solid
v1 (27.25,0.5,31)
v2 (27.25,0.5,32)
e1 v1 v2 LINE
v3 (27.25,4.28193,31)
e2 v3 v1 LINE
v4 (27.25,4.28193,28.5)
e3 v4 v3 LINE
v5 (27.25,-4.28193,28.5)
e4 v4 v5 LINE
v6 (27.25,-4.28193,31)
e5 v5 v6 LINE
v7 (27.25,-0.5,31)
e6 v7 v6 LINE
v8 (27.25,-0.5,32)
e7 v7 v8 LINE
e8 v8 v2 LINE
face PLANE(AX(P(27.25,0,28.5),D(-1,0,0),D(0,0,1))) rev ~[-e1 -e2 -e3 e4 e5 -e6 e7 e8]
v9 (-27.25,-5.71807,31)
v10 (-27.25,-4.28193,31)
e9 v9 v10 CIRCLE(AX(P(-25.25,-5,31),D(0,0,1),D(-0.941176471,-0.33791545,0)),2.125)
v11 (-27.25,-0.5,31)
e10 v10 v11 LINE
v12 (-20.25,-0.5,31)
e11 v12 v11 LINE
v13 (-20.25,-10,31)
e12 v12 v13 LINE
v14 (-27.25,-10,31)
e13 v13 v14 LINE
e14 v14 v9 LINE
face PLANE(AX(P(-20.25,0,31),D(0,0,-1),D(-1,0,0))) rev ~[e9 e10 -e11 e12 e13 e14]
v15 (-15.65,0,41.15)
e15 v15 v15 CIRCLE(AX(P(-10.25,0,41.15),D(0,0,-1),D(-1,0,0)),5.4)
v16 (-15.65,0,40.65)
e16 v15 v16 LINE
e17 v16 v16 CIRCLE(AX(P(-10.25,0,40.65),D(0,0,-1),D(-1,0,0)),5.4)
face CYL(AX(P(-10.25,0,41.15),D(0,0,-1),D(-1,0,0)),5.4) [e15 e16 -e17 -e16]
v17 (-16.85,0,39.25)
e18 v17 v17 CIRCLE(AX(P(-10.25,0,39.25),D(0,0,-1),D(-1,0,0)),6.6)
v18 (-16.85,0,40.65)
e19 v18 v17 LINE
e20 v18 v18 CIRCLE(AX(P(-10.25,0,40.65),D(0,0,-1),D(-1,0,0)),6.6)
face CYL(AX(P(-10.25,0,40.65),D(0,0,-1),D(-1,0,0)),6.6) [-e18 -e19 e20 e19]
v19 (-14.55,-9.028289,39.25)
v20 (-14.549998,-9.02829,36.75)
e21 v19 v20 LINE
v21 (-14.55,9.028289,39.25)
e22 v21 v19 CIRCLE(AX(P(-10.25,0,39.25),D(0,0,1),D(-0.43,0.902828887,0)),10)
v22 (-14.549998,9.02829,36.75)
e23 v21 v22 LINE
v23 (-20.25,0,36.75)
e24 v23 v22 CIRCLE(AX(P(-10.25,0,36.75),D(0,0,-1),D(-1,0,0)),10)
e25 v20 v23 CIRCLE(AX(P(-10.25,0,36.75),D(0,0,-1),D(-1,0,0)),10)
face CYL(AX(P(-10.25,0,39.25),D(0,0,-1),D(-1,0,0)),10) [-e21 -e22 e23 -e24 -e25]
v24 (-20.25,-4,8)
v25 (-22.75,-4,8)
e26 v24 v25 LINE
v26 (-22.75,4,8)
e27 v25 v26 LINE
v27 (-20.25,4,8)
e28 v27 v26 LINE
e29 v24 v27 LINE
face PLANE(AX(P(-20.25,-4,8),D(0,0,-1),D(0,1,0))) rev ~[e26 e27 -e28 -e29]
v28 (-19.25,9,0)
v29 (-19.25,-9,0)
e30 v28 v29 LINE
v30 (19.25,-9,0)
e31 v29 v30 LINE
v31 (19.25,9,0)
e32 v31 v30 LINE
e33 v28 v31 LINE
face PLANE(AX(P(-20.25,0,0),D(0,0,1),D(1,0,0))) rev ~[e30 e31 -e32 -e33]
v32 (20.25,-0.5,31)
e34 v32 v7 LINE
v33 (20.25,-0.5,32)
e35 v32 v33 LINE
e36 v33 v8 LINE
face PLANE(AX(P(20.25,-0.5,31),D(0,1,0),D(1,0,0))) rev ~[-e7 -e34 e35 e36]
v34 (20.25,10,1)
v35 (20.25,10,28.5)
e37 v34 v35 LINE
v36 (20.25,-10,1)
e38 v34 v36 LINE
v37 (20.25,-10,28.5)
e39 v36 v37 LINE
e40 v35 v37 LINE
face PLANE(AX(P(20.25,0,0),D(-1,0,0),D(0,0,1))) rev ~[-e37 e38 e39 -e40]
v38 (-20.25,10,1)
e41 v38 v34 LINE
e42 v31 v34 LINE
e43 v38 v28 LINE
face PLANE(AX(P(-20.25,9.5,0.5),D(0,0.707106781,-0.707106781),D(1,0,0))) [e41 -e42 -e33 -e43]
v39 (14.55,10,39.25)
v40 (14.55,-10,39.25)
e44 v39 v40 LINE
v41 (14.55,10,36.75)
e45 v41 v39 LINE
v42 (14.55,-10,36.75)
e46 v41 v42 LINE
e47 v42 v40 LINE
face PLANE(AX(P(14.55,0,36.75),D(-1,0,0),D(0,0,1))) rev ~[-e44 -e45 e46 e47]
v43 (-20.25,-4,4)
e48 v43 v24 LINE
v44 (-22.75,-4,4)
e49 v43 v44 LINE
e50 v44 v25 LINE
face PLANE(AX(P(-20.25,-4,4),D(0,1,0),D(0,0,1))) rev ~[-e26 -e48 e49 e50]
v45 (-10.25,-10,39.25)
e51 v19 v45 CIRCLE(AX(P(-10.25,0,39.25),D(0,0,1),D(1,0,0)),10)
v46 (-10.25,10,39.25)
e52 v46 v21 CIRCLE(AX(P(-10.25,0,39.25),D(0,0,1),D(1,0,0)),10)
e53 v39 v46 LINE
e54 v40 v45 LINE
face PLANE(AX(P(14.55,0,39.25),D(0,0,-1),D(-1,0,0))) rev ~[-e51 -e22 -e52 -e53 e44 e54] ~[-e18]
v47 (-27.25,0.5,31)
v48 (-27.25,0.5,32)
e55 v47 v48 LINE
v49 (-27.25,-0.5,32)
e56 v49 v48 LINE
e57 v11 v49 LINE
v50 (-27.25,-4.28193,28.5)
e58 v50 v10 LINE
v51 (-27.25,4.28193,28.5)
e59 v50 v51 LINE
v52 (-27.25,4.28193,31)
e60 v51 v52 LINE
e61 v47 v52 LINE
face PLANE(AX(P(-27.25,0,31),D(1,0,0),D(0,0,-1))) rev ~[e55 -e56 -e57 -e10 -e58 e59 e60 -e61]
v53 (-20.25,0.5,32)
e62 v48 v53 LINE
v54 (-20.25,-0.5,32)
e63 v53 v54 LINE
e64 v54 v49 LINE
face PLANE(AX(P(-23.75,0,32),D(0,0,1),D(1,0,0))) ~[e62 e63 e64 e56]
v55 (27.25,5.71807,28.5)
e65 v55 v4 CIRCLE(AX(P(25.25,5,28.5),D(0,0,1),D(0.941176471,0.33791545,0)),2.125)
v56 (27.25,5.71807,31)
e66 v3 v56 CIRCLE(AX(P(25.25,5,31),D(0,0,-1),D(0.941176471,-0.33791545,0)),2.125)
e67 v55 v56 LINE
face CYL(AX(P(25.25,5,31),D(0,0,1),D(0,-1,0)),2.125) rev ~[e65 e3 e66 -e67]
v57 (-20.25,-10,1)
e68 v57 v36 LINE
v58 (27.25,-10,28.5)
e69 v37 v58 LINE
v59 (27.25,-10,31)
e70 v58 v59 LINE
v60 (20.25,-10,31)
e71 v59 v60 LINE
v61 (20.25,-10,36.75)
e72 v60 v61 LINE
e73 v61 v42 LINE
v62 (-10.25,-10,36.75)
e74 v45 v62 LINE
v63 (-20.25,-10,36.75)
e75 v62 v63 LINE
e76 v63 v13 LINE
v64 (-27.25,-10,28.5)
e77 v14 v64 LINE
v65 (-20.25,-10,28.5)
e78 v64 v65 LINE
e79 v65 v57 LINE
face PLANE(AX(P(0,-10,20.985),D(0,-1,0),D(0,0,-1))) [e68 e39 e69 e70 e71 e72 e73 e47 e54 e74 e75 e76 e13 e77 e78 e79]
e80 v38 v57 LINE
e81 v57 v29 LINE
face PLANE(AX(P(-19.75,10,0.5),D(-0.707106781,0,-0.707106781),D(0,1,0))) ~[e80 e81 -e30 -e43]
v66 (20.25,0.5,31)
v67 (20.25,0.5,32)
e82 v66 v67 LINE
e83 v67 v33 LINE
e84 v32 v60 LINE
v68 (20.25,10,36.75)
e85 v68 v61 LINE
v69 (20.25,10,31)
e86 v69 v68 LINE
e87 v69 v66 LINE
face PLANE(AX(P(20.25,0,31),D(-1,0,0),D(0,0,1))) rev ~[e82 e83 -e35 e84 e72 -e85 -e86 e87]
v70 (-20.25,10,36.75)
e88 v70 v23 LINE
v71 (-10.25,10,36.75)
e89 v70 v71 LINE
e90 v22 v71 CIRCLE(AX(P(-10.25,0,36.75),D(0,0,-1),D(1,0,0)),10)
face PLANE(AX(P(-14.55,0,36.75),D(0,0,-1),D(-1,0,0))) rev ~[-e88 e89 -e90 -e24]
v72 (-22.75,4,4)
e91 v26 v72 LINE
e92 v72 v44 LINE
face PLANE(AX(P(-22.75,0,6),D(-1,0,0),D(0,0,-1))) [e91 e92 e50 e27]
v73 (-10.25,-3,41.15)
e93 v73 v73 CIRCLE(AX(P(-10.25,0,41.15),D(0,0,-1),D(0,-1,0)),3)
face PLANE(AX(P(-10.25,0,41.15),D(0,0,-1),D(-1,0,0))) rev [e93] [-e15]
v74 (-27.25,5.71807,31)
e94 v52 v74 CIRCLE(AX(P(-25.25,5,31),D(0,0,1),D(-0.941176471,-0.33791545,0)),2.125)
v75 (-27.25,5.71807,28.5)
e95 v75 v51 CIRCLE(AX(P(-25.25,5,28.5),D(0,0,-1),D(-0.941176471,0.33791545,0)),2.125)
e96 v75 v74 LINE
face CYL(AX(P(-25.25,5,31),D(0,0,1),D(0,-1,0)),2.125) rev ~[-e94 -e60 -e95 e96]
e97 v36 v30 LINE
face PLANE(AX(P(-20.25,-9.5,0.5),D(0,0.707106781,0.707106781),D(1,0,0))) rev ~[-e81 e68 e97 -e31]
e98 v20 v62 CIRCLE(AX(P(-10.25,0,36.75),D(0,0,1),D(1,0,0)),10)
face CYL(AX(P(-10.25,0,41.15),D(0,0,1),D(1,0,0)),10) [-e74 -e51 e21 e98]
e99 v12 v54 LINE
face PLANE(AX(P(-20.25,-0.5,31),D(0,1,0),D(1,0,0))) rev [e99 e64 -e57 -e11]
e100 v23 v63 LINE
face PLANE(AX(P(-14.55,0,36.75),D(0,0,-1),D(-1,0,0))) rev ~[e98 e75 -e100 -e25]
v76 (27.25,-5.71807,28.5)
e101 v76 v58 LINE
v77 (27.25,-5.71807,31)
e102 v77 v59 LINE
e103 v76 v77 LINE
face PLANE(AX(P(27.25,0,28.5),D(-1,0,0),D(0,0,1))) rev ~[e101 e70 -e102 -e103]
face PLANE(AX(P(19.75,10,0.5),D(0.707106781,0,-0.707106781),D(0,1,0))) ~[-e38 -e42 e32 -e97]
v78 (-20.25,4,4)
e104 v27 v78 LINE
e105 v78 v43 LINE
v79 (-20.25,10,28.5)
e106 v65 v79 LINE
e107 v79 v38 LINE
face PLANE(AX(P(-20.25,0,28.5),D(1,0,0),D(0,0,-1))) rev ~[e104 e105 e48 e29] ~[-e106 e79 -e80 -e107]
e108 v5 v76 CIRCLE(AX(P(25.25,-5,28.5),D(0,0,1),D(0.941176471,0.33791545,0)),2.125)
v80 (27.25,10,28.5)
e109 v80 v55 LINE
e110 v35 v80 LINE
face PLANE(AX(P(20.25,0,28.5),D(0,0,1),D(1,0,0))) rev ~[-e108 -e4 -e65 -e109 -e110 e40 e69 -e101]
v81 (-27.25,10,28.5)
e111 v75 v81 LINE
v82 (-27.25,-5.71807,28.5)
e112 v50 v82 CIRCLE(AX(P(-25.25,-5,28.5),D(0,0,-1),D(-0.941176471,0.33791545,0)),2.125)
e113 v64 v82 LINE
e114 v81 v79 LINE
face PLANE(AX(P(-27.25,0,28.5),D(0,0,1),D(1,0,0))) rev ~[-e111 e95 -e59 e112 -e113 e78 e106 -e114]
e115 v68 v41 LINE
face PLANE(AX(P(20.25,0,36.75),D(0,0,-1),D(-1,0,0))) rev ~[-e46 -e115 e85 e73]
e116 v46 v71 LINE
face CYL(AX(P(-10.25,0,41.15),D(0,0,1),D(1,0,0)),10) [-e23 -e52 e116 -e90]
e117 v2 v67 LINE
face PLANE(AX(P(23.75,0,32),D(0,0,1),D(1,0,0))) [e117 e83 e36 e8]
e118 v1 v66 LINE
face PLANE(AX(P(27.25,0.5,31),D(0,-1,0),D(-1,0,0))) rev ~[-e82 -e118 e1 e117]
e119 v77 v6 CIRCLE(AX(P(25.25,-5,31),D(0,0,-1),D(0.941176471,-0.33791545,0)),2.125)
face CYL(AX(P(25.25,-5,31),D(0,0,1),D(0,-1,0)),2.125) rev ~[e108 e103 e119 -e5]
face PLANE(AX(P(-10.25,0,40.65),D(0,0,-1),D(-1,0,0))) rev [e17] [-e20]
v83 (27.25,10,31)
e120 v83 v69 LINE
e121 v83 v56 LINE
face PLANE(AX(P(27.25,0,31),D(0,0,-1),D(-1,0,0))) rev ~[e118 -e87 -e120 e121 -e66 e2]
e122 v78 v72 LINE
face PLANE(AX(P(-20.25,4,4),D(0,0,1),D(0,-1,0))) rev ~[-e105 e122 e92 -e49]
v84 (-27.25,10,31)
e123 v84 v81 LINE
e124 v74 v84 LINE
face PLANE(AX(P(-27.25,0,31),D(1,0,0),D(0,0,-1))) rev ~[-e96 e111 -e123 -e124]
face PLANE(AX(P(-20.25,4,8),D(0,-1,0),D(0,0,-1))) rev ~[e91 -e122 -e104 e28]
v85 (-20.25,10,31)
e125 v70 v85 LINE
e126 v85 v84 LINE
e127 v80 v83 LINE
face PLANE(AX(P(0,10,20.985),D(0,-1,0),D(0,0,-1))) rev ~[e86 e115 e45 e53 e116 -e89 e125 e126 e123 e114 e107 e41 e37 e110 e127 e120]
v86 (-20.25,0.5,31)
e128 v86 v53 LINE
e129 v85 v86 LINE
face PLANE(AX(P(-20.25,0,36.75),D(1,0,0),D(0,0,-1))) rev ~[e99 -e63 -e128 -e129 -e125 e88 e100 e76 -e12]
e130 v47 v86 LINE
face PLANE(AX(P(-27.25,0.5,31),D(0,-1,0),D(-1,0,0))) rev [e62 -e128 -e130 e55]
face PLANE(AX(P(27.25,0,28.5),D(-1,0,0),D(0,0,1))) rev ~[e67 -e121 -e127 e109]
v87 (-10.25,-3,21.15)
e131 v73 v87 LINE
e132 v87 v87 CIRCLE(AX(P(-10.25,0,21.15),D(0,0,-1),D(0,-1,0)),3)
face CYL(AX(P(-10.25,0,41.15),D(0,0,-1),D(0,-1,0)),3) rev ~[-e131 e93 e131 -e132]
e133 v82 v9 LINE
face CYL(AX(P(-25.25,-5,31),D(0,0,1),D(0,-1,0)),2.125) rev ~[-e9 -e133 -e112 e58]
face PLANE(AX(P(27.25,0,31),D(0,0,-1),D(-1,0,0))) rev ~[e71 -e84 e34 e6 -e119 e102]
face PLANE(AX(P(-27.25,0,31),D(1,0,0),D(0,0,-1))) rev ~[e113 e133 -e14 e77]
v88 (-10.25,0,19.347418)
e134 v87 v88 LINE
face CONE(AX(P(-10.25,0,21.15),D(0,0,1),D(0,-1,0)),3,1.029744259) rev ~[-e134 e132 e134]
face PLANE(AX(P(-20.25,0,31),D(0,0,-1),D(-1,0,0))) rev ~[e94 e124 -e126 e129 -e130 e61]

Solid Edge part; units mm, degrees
sketch "Sketch1" plane through (0, 0, 0) normal (0, -1, 0) x (1, 0, 0)
  line L0 (-20.25, 28.5) -> (-20.25, 0)
  line L1 (-20.25, 0) -> (20.25, 0)
  line L2 (20.25, 0) -> (20.25, 28.5)
  line L3 (20.25, 28.5) -> (27.25, 28.5)
  line L4 (27.25, 28.5) -> (27.25, 31)
  line L5 (27.25, 31) -> (20.25, 31)
  line L6 (20.25, 31) -> (20.25, 36.75)
  line L7 (20.25, 36.75) -> (14.55, 36.75)
  line L8 (14.55, 36.75) -> (14.55, 39.25)
  line L9 (14.55, 39.25) -> (-14.55, 39.25)
  line L10 (-14.55, 39.25) -> (-14.55, 36.75)
  line L11 (-14.55, 36.75) -> (-20.25, 36.75)
  line L12 (-20.25, 36.75) -> (-20.25, 31)
  line L13 (-20.25, 31) -> (-27.25, 31)
  line L14 (-27.25, 31) -> (-27.25, 28.5)
  line L15 (-27.25, 28.5) -> (-20.25, 28.5)
  dimension "D1" = 40.5
  dimension "D2" = 54.5
  dimension "D3" = 5.7
  dimension "D4" = 39.25
  dimension "D5" = 36.75
  dimension "D6" = 28.5
  dimension "D7" = 2.5
extrude "Protrusion1" add sketch "Sketch1" along normal mid plane 20
hole "Hole_1" at (25.25, 5, 31) direction (0, 0, -1) diameter 4.25 end up to next
hole "Hole1" at (25.25, -5, 31) direction (0, 0, -1) diameter 4.25 end up to next
sketch "Sketch2" plane through (0, 0, 0) normal (0, -1, 0) x (1, 0, 0)
  line L0 (-20.25, 36.75) -> (-10.25, 36.75)
  line L1 (-10.25, 36.75) -> (-10.25, 41.15)
  line L2 (-10.25, 41.15) -> (-15.65, 41.15)
  line L3 (-15.65, 41.15) -> (-15.65, 40.65)
  line L4 (-15.65, 40.65) -> (-16.85, 40.65)
  line L5 (-16.85, 40.65) -> (-16.85, 39.25)
  line L6 (-16.85, 39.25) -> (-20.25, 39.25)
  line L7 (-20.25, 39.25) -> (-20.25, 36.75)
  dimension "D1" = 10
  dimension "D2" = 50
  dimension "D3" = 1.4
  dimension "D4" = 0.5
revolve "RevolvedProtrusion1" add sketch "Sketch2" angle 360 about axis through (-10.25, 0, 50) along (0, 0, -1)
sketch "Sketch3" plane through (-20.25, 0, 14.25) normal (-1, 0, 0) x (0, -1, 0)
  line L0 (-4, -10.25) -> (4, -10.25)
  line L1 (4, -10.25) -> (4, -6.25)
  line L2 (4, -6.25) -> (-4, -6.25)
  line L3 (-4, -6.25) -> (-4, -10.25)
  dimension "D1" = 4
  dimension "D2" = 8
  dimension "D3" = 4
extrude "ExtrudedProtrusion_2" add sketch "Sketch3" along normal blind 2.5
sketch "Sketch4" plane through (-10.25, 0, 41.15) normal (0, 0, 1) x (1, 0, 0)
  arc A0 (-4.3, 9.0283) -> (0, 10) centre (0, 0) cw
  line L0 (-4.3, 10) -> (0, 10)
  line L1 (-4.3, 9.0283) -> (-4.3, 10)
  arc A1 (-4.3, -9.0283) -> (0, -10) centre (0, 0) ccw
  line L2 (-4.3, -10) -> (0, -10)
  line L3 (-4.3, -9.0283) -> (-4.3, -10)
extrude "Cutout1" cut sketch "Sketch4" against normal up to vertex (4.4 mm away)
hole "Hole_3" at (-10.25, 0, 41.15) direction (0, 0, -1) diameter 6 depth 20 tip angle 118
chamfer "Chamfer_1" distance 1 angle 45 4 edges at (-20.25, 0, 0) (0, -10, 0) (20.25, 0, 0) (0, 10, 0)
sketch "Sketch5" plane through (23.75, 0, 31) normal (0, 0, 1) x (-1, 0, 0)
  line L0 (3.5, -0.5) -> (3.5, 0.5)
  line L1 (3.5, 0.5) -> (-3.5, 0.5)
  line L2 (-3.5, 0.5) -> (-3.5, -0.5)
  line L3 (-3.5, -0.5) -> (3.5, -0.5)
  dimension "D1" = 1
extrude "ExtrudedProtrusion_3" add sketch "Sketch5" along normal blind 1
mirror "Mirror1" about plane through (0, 0, 0) normal (1, 0, 0) of "Hole_1", "Hole1", "ExtrudedProtrusion_3"
properties material "ABS Plastic, medium impact"
